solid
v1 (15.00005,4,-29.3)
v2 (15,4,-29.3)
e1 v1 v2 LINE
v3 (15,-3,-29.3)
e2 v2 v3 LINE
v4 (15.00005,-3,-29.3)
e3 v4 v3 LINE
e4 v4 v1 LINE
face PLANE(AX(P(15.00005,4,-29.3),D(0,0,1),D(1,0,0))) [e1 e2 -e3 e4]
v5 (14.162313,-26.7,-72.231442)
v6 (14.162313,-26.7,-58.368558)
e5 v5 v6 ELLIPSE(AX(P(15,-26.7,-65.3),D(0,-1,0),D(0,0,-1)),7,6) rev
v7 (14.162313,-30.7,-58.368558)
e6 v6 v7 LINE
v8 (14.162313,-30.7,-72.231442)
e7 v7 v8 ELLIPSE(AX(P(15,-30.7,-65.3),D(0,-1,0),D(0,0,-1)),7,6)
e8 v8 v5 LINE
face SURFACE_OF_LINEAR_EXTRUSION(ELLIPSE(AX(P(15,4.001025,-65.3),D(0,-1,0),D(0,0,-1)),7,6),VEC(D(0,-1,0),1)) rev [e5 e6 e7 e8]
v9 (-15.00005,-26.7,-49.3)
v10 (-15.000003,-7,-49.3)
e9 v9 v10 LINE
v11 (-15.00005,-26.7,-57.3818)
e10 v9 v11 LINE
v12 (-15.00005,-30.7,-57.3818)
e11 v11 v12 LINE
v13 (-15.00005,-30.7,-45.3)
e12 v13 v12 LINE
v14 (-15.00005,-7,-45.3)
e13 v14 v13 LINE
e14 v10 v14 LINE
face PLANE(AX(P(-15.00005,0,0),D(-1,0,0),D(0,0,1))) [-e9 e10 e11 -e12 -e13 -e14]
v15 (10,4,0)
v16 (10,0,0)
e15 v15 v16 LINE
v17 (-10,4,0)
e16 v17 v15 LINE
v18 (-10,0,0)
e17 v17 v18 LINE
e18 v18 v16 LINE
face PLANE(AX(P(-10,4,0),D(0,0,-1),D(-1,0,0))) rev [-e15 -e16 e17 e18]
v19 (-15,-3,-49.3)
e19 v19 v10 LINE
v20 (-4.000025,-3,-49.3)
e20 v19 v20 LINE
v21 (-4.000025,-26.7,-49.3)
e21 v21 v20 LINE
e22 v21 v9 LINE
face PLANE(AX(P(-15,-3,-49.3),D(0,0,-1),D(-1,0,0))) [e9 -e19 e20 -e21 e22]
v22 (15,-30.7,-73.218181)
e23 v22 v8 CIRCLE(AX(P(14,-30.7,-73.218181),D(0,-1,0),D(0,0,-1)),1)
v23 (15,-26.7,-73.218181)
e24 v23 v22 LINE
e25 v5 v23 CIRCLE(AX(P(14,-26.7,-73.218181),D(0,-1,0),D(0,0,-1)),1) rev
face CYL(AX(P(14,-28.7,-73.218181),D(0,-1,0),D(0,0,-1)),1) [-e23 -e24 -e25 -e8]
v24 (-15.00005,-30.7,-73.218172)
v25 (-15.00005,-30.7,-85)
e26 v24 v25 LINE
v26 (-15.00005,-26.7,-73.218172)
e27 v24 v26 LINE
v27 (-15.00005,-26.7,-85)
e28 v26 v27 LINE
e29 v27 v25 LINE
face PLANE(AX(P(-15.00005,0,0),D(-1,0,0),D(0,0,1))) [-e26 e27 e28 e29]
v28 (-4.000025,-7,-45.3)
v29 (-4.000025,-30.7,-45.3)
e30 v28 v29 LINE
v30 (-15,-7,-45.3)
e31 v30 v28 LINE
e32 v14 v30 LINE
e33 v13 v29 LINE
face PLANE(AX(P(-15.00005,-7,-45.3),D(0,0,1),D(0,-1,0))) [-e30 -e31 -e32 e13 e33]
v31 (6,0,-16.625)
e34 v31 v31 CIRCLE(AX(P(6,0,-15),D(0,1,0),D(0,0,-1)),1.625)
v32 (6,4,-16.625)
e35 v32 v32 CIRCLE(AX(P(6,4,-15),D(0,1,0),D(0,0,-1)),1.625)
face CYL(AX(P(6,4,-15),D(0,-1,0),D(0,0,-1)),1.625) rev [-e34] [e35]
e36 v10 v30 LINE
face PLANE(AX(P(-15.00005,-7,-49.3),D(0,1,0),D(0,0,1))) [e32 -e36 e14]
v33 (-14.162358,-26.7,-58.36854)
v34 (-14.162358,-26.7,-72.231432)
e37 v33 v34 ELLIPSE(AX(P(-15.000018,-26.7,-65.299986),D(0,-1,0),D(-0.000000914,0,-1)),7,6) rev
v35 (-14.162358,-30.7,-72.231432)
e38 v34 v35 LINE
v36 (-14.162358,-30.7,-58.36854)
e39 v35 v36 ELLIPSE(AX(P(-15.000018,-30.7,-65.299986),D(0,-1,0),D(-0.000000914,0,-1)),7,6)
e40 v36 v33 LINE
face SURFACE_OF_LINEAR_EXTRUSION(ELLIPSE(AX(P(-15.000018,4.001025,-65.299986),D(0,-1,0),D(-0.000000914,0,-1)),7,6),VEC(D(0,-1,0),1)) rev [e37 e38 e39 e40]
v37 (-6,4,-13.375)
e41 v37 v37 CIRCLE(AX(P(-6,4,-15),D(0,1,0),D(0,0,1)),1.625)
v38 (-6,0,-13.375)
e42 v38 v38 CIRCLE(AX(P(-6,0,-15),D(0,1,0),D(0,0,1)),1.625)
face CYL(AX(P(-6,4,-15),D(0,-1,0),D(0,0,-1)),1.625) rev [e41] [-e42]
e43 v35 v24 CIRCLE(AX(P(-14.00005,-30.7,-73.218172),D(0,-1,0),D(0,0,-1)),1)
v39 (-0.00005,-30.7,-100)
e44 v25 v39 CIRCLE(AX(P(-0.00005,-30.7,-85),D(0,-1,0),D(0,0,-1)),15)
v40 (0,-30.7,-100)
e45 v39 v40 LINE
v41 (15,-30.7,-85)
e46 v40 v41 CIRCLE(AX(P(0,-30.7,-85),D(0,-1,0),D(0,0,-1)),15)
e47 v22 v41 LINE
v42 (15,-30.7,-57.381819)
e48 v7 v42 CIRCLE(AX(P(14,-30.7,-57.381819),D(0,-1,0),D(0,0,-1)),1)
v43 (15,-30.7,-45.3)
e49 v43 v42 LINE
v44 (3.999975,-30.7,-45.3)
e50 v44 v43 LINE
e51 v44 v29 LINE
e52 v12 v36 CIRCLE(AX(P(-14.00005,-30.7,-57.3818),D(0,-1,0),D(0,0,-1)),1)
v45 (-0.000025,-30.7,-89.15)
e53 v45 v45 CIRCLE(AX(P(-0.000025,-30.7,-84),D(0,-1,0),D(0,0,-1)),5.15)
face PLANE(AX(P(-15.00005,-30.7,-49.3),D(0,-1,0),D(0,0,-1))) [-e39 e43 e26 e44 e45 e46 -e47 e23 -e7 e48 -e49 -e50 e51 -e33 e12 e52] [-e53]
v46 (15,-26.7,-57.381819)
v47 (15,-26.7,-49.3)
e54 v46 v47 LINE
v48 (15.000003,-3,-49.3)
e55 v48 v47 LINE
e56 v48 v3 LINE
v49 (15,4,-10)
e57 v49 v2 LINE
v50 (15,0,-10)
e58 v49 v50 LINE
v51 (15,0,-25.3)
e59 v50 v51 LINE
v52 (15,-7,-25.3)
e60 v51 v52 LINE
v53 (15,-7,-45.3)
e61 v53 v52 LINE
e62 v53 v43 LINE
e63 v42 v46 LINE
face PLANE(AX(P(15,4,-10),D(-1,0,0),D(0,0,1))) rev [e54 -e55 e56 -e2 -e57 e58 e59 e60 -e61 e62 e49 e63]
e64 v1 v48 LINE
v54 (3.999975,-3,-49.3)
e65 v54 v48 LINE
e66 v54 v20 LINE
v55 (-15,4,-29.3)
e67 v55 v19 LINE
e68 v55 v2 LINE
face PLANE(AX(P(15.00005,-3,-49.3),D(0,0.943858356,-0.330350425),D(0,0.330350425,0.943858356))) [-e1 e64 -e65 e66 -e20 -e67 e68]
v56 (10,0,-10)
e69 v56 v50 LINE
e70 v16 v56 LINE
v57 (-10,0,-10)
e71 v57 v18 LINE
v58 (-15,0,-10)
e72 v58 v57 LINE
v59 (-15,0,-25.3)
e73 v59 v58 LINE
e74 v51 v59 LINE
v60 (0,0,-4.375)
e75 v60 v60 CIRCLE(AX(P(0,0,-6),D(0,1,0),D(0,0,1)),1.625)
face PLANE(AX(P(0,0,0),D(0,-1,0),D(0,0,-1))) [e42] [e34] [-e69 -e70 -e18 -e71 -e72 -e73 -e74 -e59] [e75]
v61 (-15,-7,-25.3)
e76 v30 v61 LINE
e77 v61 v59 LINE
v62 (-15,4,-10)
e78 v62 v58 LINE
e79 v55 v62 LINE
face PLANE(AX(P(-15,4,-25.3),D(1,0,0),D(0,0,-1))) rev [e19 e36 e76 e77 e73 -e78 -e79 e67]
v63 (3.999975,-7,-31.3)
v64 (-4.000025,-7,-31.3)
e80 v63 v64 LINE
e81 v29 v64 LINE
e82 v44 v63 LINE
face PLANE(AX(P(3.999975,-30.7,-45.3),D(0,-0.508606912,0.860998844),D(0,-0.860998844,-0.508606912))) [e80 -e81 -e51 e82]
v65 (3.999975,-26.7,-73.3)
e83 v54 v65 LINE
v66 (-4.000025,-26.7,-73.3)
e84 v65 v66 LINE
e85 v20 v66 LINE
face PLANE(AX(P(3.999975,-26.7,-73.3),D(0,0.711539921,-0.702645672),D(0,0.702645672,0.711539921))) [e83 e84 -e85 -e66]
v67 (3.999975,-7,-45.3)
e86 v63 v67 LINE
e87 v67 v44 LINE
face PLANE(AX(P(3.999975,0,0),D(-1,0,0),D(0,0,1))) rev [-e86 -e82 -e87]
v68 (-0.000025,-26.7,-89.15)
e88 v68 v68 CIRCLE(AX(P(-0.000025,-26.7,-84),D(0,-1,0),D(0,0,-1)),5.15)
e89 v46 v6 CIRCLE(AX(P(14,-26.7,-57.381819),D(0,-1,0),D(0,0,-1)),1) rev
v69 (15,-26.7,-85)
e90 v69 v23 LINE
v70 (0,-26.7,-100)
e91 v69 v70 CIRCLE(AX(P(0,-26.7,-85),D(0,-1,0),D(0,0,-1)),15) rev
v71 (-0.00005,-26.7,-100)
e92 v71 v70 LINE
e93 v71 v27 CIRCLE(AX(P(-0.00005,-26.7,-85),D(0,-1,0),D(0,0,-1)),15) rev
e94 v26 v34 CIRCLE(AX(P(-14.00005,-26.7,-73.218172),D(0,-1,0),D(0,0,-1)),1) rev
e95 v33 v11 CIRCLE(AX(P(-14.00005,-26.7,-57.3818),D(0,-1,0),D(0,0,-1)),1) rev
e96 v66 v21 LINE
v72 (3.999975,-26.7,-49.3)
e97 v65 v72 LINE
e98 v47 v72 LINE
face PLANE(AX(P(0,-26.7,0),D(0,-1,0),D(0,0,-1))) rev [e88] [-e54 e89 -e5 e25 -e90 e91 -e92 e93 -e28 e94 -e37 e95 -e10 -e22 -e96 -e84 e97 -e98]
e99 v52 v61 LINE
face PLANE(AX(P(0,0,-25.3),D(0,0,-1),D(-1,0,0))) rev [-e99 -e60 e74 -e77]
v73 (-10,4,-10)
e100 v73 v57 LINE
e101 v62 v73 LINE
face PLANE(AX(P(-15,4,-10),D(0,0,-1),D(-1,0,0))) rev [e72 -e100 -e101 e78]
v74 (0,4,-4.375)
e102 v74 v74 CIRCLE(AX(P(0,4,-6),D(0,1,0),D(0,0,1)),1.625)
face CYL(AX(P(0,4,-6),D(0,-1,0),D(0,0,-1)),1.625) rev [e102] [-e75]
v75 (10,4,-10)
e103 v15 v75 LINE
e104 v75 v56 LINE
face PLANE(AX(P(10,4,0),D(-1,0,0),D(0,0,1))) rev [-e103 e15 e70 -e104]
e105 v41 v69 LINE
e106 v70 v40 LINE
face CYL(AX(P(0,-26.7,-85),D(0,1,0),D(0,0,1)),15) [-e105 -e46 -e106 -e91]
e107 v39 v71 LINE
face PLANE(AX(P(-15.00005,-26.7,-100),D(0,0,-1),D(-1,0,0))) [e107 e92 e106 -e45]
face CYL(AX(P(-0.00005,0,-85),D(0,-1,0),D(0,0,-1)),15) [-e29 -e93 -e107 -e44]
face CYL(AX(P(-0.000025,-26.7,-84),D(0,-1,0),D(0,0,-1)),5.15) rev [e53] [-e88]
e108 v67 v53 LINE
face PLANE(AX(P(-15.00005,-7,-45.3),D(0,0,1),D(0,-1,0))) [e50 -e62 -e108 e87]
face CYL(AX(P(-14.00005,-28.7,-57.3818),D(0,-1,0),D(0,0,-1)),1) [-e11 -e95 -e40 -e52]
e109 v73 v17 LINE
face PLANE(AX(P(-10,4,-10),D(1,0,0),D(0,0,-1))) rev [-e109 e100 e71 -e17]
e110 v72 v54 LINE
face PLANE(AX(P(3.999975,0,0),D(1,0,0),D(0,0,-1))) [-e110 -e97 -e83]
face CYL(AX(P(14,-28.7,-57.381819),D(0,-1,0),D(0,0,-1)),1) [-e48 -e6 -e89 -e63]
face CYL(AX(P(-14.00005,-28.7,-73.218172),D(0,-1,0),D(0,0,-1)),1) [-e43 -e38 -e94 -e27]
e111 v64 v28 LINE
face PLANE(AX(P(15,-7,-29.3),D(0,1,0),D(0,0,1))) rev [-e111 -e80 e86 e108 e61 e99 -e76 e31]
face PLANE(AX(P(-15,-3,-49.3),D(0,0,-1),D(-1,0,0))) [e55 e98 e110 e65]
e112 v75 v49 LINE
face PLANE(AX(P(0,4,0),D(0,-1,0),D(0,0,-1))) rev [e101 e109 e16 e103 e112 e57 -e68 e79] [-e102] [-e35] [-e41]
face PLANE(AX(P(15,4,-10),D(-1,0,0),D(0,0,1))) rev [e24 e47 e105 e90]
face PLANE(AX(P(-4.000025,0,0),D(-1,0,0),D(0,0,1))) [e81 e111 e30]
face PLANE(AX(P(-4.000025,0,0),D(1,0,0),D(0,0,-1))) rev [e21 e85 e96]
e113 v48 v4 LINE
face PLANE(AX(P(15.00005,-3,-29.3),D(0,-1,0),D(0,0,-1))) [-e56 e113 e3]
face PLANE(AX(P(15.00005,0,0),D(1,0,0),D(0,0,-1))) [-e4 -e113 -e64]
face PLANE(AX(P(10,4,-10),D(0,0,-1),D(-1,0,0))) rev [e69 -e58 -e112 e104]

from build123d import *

# Parameters (mm, degrees)
SKETCH_1_R           = 1.625
EXTRUDE_1_DEPTH      = 4
SKETCH_2_W           = 30
SKETCH_2_H           = 11
EXTRUDE_2_DEPTH      = 4
SKETCH_3_W           = 30
SKETCH_3_H           = 24
EXTRUDE_3_DEPTH      = 4
EXTRUDE_4_DEPTH      = 30
SKETCH_5_W           = 4
SKETCH_5_H           = 23.7
EXTRUDE_5_DEPTH      = 30
SKETCH_6_W           = 30.00005
SKETCH_6_H           = 54.7
SKETCH_6_R           = 5.15
EXTRUDE_6_DEPTH      = 4
CUT_EXTRUDE_1_REACH  = 108.907
SKETCH_8_RX          = 7
SKETCH_8_RY          = 6
FILLET_START         = -32
FILLET_2_DEPTH       = 6
FILLET_3_R           = 15
EXTRUDE_8_DEPTH      = 4
EXTRUDE_8_DEPTH_BACK = 4
EXTRUDE_9_DEPTH      = 4
EXTRUDE_9_DEPTH_BACK = 4


with BuildPart() as part:
    # Эскиз1 → Бобышка-Вытянуть1 (new body)
    with BuildSketch(Plane(origin=(0, 0, 0), x_dir=(1, 0, 0), z_dir=(0, 1, 0))):
        Polygon((-10, 0), (10, 0), (10, 10), (15, 10), (15, 25.3), (-15, 25.3), (-15, 10), (-10, 10), align=None)
        with Locations(Location((-6, 15, 0), (0, 0, 270))):
            Circle(SKETCH_1_R, mode=Mode.SUBTRACT)
        with Locations(Location((0, 6, 0), (0, 0, 270))):
            Circle(SKETCH_1_R, mode=Mode.SUBTRACT)
        with Locations(Location((6, 15, 0), (0, 0, 90))):
            Circle(SKETCH_1_R, mode=Mode.SUBTRACT)
    extrude(amount=EXTRUDE_1_DEPTH)

    # Эскиз2 → Бобышка-Вытянуть2 (add)
    with BuildSketch(Plane(origin=(0, 0, -25.3), x_dir=(-1, 0, 0), z_dir=(0, 0, -1))):
        with Locations((0, -1.5)):
            Rectangle(SKETCH_2_W, SKETCH_2_H)
    extrude(amount=EXTRUDE_2_DEPTH)

    # Эскиз3 → Бобышка-Вытянуть3 (add)
    with BuildSketch(Plane.XZ.offset(7)):
        with Locations((0, -37.3)):
            Rectangle(SKETCH_3_W, SKETCH_3_H)
    extrude(amount=-EXTRUDE_3_DEPTH)

    # Эскиз4 → Бобышка-Вытянуть4 (add, through all)
    with BuildSketch(Plane.ZY.offset(15)):
        Polygon((-29.3, 4), (-29.3, -3), (-49.3, -3), align=None)
    extrude(amount=-EXTRUDE_4_DEPTH)

    # Эскиз5 → Бобышка-Вытянуть5 (add, through all)
    with BuildSketch(Plane(origin=(15, 0, 0), x_dir=(0, 0, -1), z_dir=(1, 0, 0))):
        with Locations((47.3, -18.85)):
            Rectangle(SKETCH_5_W, SKETCH_5_H)
    extrude(amount=-EXTRUDE_5_DEPTH)

    # Эскиз6 → Бобышка-Вытянуть6 (add)
    with BuildSketch(Plane.XZ.offset(30.7)):
        with Locations((-2.5e-05, -72.65)):
            Rectangle(SKETCH_6_W, SKETCH_6_H)
        with Locations(Location((-2.5e-05, -84, 0), (0, 0, 270))):
            Circle(SKETCH_6_R, mode=Mode.SUBTRACT)
    extrude(amount=-EXTRUDE_6_DEPTH)

    # Эскиз8 → Вырез-Вытянуть1 (cut, up to next)
    with BuildSketch(Plane.XZ.offset(30.7), mode=Mode.PRIVATE) as cut_extrude_1_sk1:
        with Locations(Location((15, -65.3), (0, 0, -90))):
            Ellipse(SKETCH_8_RX, SKETCH_8_RY)
    cut_extrude_1_tool1 = extrude(cut_extrude_1_sk1.sketch, amount=-CUT_EXTRUDE_1_REACH, mode=Mode.PRIVATE) & part.part
    # Эскиз8 → Вырез-Вытянуть1 (cut, up to next)
    with BuildSketch(Plane.XZ.offset(30.7), mode=Mode.PRIVATE) as cut_extrude_1_sk2:
        with Locations(Location((-15.000018282, -65.299986289), (0, 0, -90.000052373))):
            Ellipse(SKETCH_8_RX, SKETCH_8_RY)
    cut_extrude_1_tool2 = extrude(cut_extrude_1_sk2.sketch, amount=-CUT_EXTRUDE_1_REACH, mode=Mode.PRIVATE) & part.part
    add(cut_extrude_1_tool1.solids().sort_by_distance((15, -30.7, -65.3))[0], mode=Mode.SUBTRACT)
    add(cut_extrude_1_tool2.solids().sort_by_distance((-15.000018, -30.7, -65.299986))[0], mode=Mode.SUBTRACT)

    # Скругление2: read off the stored shape, not the designer's step
    # Скругление2 outline → Скругление2 (cut)
    with BuildSketch(Plane(origin=(0, 0, 0), x_dir=(1, 0, 0), z_dir=(0, 1, 0)).offset(FILLET_START)):
        with BuildLine():
            Line((15, 72.3), (15, 73.218180859))
            ThreePointArc((15, 73.218180859), (14.762336304, 72.570999772), (14.162313281, 72.231441583))
            add(Edge.make_bspline(
                [(14.162313281, 72.231441583), (14.579095458, 72.3), (15, 72.3)],
                knots=[6.131749827, 6.131749827, 6.131749827, 6.283185307, 6.283185307, 6.283185307], degree=2, weights=[0.948970652, 0.971763096, 1]))
        make_face()
        with BuildLine():
            add(Edge.make_bspline(
                [(15, 58.3), (14.579095458, 58.3), (14.162313281, 58.368558417)],
                knots=[3.141592654, 3.141592654, 3.141592654, 3.293028134, 3.293028134, 3.293028134], degree=2, weights=[1, 0.971763096, 0.948970652]))
            ThreePointArc((14.162313281, 58.368558417), (14.762336304, 58.029000228), (15, 57.381819141))
            Line((15, 57.381819141), (15, 58.3))
        make_face()
        with BuildLine():
            add(Edge.make_bspline(
                [(-15.00005, 72.299986289), (-14.579143154, 72.299988746), (-14.162358429, 72.231432015)],
                knots=[6.283181087, 6.283181087, 6.283181087, 6.434617466, 6.434617466, 6.434617466], degree=2, weights=[1, 0.971762843, 0.948970209]))
            ThreePointArc((-14.162358429, 72.231432015), (-14.762384713, 72.570989127), (-15.00005, 73.218172089))
            Line((-15.00005, 73.218172089), (-15.00005, 72.299986289))
        make_face()
        with BuildLine():
            ThreePointArc((-15.00005, 57.381799936), (-14.762384538, 58.028983103), (-14.162357897, 58.368540098))
            add(Edge.make_bspline(
                [(-14.162357897, 58.368540098), (-14.579142884, 58.299983554), (-15.00005, 58.299986289)],
                knots=[9.27334784, 9.27334784, 9.27334784, 9.424784314, 9.424784314, 9.424784314], degree=2, weights=[0.948970181, 0.971762826, 1]))
            Line((-15.00005, 58.299986289), (-15.00005, 57.381799936))
        make_face()
    extrude(amount=FILLET_2_DEPTH, mode=Mode.SUBTRACT)

    # Скругление3
    fillet_3_edges = [part.edges().sort_by_distance(p)[0] for p in [
        (-15.00005, -28.7, -100),
        (15, -28.7, -100),
    ]]
    fillet(fillet_3_edges, radius=FILLET_3_R)

    # Эскиз10 → Бобышка-Вытянуть8 (add, two sides: drawn at the far end of the back side and taken through both)
    with BuildSketch(Plane.ZY.offset(2.5e-05).offset(-EXTRUDE_8_DEPTH_BACK)):
        Polygon((-49.3, -26.7), (-73.3, -26.7), (-49.3, -3), align=None)
    extrude(amount=EXTRUDE_8_DEPTH + EXTRUDE_8_DEPTH_BACK)

    # Эскиз11 → Бобышка-Вытянуть9 (add, two sides: drawn at the far end of the back side and taken through both)
    with BuildSketch(Plane.ZY.offset(2.5e-05).offset(-EXTRUDE_9_DEPTH_BACK)):
        Polygon((-31.3, -7), (-45.3, -7), (-45.3, -30.7), align=None)
    extrude(amount=EXTRUDE_9_DEPTH + EXTRUDE_9_DEPTH_BACK)


solid = part.part
